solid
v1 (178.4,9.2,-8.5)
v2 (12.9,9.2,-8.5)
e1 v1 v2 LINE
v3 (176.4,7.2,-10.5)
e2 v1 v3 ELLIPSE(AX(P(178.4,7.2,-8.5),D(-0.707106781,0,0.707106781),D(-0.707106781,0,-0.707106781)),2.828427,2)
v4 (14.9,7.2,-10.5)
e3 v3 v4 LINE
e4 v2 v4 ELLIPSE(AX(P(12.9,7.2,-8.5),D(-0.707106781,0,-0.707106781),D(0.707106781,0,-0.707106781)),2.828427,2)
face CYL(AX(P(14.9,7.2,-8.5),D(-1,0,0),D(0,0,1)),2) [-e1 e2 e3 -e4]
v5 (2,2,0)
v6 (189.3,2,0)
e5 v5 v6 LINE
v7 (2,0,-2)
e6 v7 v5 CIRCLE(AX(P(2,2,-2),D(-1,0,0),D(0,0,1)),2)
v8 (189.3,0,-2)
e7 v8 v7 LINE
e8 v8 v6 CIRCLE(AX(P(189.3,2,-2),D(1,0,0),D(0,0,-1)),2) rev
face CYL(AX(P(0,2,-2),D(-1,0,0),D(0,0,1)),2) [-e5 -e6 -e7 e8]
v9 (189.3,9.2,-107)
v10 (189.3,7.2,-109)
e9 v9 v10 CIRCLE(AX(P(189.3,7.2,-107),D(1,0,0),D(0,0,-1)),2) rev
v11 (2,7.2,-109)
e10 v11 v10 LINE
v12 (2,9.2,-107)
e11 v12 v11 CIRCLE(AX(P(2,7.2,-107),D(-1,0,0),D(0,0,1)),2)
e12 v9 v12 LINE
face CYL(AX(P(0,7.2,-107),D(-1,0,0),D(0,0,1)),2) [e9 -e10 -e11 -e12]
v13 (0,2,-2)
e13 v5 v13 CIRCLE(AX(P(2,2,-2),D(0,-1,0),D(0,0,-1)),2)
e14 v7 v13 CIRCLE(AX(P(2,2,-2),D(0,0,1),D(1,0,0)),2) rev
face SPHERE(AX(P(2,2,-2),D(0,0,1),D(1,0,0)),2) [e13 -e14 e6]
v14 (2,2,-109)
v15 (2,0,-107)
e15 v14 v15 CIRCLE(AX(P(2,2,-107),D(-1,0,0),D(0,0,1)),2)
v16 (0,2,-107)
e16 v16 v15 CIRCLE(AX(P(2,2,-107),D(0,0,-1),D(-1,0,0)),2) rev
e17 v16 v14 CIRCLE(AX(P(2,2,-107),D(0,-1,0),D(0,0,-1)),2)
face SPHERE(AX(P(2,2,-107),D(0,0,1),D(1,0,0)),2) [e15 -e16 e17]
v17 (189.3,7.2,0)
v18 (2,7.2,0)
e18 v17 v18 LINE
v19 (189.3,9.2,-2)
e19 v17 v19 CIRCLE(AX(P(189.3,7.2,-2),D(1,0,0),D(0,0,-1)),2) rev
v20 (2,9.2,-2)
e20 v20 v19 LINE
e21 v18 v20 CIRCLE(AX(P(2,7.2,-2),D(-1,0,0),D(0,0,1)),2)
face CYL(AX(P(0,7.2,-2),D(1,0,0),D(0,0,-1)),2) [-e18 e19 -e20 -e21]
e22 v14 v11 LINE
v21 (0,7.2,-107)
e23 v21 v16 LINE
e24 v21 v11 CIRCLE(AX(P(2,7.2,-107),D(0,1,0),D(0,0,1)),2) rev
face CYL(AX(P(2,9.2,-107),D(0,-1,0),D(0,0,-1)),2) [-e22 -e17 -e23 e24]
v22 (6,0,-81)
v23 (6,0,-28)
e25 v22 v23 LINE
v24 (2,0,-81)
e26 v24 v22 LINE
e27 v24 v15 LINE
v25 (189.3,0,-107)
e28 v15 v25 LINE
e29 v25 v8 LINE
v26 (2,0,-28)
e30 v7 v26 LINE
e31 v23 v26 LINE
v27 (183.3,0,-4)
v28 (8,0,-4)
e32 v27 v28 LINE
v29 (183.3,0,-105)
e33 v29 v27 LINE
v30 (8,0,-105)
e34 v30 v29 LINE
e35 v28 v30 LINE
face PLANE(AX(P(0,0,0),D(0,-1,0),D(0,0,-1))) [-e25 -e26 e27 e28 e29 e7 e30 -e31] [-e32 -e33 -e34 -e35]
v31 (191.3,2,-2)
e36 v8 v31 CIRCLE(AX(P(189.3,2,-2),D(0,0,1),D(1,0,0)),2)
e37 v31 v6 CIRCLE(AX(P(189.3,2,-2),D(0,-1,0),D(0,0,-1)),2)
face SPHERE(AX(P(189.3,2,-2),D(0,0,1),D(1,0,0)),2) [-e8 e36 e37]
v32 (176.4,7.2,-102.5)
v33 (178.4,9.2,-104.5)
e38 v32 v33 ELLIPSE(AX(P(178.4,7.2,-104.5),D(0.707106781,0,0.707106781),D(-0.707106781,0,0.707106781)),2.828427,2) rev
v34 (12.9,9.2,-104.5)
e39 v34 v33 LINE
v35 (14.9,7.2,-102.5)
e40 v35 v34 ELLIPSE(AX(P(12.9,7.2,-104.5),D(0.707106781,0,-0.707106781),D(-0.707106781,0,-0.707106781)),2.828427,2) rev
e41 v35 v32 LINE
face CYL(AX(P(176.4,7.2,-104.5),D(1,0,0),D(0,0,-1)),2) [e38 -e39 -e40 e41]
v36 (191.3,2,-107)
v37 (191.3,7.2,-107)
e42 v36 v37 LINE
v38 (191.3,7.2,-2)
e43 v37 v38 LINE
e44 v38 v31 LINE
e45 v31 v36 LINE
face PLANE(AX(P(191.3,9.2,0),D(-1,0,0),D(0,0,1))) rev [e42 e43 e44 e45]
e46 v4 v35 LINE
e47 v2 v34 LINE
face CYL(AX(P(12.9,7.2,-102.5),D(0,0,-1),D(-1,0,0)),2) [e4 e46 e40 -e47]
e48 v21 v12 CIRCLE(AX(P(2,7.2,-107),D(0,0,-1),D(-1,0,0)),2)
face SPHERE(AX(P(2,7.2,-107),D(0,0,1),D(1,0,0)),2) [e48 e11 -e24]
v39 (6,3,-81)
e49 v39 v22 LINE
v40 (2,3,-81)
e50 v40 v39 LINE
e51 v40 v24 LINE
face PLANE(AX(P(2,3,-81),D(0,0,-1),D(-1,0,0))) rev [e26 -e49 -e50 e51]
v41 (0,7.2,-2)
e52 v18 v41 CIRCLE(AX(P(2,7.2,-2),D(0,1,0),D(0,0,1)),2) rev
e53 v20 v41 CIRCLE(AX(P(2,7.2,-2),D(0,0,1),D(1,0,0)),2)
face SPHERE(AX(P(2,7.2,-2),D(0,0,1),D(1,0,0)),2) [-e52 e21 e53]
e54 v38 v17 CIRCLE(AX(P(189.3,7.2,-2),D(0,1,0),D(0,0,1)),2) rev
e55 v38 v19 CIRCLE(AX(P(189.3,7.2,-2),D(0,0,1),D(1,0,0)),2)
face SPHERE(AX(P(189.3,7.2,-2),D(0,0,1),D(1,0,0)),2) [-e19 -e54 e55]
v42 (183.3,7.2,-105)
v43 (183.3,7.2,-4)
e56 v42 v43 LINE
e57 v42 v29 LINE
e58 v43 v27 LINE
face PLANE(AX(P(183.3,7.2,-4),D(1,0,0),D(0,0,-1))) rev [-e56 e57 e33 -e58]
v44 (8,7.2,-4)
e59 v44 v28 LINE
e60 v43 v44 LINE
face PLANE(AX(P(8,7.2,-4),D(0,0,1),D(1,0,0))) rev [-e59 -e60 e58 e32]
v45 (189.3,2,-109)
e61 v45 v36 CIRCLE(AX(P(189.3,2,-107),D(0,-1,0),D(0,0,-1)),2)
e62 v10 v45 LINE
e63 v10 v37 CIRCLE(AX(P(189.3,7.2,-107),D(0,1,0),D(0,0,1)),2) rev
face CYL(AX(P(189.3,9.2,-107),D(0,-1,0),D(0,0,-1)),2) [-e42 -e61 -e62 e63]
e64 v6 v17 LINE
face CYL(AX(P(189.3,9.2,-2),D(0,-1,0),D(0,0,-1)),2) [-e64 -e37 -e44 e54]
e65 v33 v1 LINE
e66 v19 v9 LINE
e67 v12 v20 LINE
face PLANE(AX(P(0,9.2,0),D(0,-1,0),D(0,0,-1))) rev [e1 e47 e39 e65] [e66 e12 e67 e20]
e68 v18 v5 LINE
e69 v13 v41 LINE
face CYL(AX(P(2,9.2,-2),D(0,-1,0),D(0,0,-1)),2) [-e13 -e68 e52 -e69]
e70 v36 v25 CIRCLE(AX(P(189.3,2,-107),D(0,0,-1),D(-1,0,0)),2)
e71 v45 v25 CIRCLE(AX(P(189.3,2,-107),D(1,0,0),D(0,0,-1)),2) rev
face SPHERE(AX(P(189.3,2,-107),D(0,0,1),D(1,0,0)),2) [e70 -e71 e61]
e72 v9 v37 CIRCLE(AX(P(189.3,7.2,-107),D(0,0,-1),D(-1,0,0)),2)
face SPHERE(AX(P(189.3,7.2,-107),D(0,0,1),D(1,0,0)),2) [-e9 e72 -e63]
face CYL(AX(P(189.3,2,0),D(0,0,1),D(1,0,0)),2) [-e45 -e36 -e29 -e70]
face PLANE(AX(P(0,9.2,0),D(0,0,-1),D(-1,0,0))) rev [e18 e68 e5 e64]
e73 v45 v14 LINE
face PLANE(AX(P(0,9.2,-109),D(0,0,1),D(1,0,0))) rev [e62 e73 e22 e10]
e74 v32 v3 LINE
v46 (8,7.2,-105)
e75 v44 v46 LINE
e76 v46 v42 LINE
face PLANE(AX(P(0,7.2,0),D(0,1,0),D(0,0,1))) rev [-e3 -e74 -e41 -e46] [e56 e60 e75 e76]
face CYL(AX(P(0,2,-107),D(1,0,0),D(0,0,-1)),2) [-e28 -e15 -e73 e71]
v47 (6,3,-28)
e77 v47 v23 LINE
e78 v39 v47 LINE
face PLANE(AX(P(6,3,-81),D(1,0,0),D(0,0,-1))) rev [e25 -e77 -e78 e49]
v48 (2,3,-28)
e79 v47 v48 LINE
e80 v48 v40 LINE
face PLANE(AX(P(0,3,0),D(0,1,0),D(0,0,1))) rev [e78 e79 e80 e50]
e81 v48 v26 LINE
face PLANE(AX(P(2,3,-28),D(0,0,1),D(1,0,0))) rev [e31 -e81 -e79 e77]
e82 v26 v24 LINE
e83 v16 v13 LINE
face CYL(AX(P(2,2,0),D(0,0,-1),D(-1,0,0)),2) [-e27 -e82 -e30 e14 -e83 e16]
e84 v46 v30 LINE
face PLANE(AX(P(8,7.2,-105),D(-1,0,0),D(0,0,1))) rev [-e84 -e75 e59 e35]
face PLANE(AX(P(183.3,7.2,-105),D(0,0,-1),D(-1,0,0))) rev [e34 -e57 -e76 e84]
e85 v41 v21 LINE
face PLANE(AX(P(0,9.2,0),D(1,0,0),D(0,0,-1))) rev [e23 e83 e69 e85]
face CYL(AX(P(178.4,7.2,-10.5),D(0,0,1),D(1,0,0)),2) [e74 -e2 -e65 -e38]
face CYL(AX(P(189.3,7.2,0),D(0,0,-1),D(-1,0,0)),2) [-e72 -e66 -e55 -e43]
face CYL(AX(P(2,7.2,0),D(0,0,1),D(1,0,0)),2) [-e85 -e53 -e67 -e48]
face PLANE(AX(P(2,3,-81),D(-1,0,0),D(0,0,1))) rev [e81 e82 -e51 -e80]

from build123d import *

# Parameters (mm, degrees)
CROQUIS1_W              = 191.3
CROQUIS1_H              = 109
CROQUIS1_W_2            = 161.5
CROQUIS1_H_2            = 92
SALIENTE_EXTRUIR1_DEPTH = 9.2
CROQUIS2_W              = 175.3
CROQUIS2_H              = 101
CROQUIS2_W_2            = 161.5
CROQUIS2_H_2            = 92
CORTAR_EXTRUIR1_DEPTH   = 7.2
CROQUIS3_W              = 4
CROQUIS3_H              = 53
CORTAR_EXTRUIR2_DEPTH   = 3
REDONDEO3_R             = 2


with BuildPart() as part:
    # Croquis1 → Saliente-Extruir1 (new body)
    with BuildSketch(Plane(origin=(0, 0, 0), x_dir=(1, 0, 0), z_dir=(0, 1, 0))):
        with Locations((95.65, 54.5)):
            Rectangle(CROQUIS1_W, CROQUIS1_H)
        with Locations((95.65, 56.5)):
            Rectangle(CROQUIS1_W_2, CROQUIS1_H_2, mode=Mode.SUBTRACT)
    extrude(amount=SALIENTE_EXTRUIR1_DEPTH)

    # Croquis2 → Cortar-Extruir1 (cut)
    with BuildSketch(Plane.XZ):
        with Locations((95.65, -54.5)):
            Rectangle(CROQUIS2_W, CROQUIS2_H)
        with Locations((95.65, -56.5)):
            Rectangle(CROQUIS2_W_2, CROQUIS2_H_2, mode=Mode.SUBTRACT)
    extrude(amount=-CORTAR_EXTRUIR1_DEPTH, mode=Mode.SUBTRACT)

    # Croquis3 → Cortar-Extruir2 (cut)
    with BuildSketch(Plane.XZ):
        with Locations((4, -54.5)):
            Rectangle(CROQUIS3_W, CROQUIS3_H)
    extrude(amount=-CORTAR_EXTRUIR2_DEPTH, mode=Mode.SUBTRACT)

    # Redondeo3
    redondeo3_edges = [part.edges().sort_by_distance(p)[0] for p in [
        (0, 0, -54.5),
        (0, 4.6, -109),
        (95.65, 0, -109),
        (191.3, 4.6, -109),
        (191.3, 0, -54.5),
        (0, 4.6, 0),
        (191.3, 4.6, 0),
        (95.65, 0, 0),
        (14.9, 9.2, -56.5),
        (95.65, 9.2, -10.5),
        (176.4, 9.2, -56.5),
        (95.65, 9.2, -102.5),
        (95.65, 9.2, -109),
        (191.3, 9.2, -54.5),
        (95.65, 9.2, 0),
        (0, 9.2, -54.5),
    ]]
    fillet(redondeo3_edges, radius=REDONDEO3_R - 0.0001)  # a hair under: the kernel refuses the full size


solid = part.part
